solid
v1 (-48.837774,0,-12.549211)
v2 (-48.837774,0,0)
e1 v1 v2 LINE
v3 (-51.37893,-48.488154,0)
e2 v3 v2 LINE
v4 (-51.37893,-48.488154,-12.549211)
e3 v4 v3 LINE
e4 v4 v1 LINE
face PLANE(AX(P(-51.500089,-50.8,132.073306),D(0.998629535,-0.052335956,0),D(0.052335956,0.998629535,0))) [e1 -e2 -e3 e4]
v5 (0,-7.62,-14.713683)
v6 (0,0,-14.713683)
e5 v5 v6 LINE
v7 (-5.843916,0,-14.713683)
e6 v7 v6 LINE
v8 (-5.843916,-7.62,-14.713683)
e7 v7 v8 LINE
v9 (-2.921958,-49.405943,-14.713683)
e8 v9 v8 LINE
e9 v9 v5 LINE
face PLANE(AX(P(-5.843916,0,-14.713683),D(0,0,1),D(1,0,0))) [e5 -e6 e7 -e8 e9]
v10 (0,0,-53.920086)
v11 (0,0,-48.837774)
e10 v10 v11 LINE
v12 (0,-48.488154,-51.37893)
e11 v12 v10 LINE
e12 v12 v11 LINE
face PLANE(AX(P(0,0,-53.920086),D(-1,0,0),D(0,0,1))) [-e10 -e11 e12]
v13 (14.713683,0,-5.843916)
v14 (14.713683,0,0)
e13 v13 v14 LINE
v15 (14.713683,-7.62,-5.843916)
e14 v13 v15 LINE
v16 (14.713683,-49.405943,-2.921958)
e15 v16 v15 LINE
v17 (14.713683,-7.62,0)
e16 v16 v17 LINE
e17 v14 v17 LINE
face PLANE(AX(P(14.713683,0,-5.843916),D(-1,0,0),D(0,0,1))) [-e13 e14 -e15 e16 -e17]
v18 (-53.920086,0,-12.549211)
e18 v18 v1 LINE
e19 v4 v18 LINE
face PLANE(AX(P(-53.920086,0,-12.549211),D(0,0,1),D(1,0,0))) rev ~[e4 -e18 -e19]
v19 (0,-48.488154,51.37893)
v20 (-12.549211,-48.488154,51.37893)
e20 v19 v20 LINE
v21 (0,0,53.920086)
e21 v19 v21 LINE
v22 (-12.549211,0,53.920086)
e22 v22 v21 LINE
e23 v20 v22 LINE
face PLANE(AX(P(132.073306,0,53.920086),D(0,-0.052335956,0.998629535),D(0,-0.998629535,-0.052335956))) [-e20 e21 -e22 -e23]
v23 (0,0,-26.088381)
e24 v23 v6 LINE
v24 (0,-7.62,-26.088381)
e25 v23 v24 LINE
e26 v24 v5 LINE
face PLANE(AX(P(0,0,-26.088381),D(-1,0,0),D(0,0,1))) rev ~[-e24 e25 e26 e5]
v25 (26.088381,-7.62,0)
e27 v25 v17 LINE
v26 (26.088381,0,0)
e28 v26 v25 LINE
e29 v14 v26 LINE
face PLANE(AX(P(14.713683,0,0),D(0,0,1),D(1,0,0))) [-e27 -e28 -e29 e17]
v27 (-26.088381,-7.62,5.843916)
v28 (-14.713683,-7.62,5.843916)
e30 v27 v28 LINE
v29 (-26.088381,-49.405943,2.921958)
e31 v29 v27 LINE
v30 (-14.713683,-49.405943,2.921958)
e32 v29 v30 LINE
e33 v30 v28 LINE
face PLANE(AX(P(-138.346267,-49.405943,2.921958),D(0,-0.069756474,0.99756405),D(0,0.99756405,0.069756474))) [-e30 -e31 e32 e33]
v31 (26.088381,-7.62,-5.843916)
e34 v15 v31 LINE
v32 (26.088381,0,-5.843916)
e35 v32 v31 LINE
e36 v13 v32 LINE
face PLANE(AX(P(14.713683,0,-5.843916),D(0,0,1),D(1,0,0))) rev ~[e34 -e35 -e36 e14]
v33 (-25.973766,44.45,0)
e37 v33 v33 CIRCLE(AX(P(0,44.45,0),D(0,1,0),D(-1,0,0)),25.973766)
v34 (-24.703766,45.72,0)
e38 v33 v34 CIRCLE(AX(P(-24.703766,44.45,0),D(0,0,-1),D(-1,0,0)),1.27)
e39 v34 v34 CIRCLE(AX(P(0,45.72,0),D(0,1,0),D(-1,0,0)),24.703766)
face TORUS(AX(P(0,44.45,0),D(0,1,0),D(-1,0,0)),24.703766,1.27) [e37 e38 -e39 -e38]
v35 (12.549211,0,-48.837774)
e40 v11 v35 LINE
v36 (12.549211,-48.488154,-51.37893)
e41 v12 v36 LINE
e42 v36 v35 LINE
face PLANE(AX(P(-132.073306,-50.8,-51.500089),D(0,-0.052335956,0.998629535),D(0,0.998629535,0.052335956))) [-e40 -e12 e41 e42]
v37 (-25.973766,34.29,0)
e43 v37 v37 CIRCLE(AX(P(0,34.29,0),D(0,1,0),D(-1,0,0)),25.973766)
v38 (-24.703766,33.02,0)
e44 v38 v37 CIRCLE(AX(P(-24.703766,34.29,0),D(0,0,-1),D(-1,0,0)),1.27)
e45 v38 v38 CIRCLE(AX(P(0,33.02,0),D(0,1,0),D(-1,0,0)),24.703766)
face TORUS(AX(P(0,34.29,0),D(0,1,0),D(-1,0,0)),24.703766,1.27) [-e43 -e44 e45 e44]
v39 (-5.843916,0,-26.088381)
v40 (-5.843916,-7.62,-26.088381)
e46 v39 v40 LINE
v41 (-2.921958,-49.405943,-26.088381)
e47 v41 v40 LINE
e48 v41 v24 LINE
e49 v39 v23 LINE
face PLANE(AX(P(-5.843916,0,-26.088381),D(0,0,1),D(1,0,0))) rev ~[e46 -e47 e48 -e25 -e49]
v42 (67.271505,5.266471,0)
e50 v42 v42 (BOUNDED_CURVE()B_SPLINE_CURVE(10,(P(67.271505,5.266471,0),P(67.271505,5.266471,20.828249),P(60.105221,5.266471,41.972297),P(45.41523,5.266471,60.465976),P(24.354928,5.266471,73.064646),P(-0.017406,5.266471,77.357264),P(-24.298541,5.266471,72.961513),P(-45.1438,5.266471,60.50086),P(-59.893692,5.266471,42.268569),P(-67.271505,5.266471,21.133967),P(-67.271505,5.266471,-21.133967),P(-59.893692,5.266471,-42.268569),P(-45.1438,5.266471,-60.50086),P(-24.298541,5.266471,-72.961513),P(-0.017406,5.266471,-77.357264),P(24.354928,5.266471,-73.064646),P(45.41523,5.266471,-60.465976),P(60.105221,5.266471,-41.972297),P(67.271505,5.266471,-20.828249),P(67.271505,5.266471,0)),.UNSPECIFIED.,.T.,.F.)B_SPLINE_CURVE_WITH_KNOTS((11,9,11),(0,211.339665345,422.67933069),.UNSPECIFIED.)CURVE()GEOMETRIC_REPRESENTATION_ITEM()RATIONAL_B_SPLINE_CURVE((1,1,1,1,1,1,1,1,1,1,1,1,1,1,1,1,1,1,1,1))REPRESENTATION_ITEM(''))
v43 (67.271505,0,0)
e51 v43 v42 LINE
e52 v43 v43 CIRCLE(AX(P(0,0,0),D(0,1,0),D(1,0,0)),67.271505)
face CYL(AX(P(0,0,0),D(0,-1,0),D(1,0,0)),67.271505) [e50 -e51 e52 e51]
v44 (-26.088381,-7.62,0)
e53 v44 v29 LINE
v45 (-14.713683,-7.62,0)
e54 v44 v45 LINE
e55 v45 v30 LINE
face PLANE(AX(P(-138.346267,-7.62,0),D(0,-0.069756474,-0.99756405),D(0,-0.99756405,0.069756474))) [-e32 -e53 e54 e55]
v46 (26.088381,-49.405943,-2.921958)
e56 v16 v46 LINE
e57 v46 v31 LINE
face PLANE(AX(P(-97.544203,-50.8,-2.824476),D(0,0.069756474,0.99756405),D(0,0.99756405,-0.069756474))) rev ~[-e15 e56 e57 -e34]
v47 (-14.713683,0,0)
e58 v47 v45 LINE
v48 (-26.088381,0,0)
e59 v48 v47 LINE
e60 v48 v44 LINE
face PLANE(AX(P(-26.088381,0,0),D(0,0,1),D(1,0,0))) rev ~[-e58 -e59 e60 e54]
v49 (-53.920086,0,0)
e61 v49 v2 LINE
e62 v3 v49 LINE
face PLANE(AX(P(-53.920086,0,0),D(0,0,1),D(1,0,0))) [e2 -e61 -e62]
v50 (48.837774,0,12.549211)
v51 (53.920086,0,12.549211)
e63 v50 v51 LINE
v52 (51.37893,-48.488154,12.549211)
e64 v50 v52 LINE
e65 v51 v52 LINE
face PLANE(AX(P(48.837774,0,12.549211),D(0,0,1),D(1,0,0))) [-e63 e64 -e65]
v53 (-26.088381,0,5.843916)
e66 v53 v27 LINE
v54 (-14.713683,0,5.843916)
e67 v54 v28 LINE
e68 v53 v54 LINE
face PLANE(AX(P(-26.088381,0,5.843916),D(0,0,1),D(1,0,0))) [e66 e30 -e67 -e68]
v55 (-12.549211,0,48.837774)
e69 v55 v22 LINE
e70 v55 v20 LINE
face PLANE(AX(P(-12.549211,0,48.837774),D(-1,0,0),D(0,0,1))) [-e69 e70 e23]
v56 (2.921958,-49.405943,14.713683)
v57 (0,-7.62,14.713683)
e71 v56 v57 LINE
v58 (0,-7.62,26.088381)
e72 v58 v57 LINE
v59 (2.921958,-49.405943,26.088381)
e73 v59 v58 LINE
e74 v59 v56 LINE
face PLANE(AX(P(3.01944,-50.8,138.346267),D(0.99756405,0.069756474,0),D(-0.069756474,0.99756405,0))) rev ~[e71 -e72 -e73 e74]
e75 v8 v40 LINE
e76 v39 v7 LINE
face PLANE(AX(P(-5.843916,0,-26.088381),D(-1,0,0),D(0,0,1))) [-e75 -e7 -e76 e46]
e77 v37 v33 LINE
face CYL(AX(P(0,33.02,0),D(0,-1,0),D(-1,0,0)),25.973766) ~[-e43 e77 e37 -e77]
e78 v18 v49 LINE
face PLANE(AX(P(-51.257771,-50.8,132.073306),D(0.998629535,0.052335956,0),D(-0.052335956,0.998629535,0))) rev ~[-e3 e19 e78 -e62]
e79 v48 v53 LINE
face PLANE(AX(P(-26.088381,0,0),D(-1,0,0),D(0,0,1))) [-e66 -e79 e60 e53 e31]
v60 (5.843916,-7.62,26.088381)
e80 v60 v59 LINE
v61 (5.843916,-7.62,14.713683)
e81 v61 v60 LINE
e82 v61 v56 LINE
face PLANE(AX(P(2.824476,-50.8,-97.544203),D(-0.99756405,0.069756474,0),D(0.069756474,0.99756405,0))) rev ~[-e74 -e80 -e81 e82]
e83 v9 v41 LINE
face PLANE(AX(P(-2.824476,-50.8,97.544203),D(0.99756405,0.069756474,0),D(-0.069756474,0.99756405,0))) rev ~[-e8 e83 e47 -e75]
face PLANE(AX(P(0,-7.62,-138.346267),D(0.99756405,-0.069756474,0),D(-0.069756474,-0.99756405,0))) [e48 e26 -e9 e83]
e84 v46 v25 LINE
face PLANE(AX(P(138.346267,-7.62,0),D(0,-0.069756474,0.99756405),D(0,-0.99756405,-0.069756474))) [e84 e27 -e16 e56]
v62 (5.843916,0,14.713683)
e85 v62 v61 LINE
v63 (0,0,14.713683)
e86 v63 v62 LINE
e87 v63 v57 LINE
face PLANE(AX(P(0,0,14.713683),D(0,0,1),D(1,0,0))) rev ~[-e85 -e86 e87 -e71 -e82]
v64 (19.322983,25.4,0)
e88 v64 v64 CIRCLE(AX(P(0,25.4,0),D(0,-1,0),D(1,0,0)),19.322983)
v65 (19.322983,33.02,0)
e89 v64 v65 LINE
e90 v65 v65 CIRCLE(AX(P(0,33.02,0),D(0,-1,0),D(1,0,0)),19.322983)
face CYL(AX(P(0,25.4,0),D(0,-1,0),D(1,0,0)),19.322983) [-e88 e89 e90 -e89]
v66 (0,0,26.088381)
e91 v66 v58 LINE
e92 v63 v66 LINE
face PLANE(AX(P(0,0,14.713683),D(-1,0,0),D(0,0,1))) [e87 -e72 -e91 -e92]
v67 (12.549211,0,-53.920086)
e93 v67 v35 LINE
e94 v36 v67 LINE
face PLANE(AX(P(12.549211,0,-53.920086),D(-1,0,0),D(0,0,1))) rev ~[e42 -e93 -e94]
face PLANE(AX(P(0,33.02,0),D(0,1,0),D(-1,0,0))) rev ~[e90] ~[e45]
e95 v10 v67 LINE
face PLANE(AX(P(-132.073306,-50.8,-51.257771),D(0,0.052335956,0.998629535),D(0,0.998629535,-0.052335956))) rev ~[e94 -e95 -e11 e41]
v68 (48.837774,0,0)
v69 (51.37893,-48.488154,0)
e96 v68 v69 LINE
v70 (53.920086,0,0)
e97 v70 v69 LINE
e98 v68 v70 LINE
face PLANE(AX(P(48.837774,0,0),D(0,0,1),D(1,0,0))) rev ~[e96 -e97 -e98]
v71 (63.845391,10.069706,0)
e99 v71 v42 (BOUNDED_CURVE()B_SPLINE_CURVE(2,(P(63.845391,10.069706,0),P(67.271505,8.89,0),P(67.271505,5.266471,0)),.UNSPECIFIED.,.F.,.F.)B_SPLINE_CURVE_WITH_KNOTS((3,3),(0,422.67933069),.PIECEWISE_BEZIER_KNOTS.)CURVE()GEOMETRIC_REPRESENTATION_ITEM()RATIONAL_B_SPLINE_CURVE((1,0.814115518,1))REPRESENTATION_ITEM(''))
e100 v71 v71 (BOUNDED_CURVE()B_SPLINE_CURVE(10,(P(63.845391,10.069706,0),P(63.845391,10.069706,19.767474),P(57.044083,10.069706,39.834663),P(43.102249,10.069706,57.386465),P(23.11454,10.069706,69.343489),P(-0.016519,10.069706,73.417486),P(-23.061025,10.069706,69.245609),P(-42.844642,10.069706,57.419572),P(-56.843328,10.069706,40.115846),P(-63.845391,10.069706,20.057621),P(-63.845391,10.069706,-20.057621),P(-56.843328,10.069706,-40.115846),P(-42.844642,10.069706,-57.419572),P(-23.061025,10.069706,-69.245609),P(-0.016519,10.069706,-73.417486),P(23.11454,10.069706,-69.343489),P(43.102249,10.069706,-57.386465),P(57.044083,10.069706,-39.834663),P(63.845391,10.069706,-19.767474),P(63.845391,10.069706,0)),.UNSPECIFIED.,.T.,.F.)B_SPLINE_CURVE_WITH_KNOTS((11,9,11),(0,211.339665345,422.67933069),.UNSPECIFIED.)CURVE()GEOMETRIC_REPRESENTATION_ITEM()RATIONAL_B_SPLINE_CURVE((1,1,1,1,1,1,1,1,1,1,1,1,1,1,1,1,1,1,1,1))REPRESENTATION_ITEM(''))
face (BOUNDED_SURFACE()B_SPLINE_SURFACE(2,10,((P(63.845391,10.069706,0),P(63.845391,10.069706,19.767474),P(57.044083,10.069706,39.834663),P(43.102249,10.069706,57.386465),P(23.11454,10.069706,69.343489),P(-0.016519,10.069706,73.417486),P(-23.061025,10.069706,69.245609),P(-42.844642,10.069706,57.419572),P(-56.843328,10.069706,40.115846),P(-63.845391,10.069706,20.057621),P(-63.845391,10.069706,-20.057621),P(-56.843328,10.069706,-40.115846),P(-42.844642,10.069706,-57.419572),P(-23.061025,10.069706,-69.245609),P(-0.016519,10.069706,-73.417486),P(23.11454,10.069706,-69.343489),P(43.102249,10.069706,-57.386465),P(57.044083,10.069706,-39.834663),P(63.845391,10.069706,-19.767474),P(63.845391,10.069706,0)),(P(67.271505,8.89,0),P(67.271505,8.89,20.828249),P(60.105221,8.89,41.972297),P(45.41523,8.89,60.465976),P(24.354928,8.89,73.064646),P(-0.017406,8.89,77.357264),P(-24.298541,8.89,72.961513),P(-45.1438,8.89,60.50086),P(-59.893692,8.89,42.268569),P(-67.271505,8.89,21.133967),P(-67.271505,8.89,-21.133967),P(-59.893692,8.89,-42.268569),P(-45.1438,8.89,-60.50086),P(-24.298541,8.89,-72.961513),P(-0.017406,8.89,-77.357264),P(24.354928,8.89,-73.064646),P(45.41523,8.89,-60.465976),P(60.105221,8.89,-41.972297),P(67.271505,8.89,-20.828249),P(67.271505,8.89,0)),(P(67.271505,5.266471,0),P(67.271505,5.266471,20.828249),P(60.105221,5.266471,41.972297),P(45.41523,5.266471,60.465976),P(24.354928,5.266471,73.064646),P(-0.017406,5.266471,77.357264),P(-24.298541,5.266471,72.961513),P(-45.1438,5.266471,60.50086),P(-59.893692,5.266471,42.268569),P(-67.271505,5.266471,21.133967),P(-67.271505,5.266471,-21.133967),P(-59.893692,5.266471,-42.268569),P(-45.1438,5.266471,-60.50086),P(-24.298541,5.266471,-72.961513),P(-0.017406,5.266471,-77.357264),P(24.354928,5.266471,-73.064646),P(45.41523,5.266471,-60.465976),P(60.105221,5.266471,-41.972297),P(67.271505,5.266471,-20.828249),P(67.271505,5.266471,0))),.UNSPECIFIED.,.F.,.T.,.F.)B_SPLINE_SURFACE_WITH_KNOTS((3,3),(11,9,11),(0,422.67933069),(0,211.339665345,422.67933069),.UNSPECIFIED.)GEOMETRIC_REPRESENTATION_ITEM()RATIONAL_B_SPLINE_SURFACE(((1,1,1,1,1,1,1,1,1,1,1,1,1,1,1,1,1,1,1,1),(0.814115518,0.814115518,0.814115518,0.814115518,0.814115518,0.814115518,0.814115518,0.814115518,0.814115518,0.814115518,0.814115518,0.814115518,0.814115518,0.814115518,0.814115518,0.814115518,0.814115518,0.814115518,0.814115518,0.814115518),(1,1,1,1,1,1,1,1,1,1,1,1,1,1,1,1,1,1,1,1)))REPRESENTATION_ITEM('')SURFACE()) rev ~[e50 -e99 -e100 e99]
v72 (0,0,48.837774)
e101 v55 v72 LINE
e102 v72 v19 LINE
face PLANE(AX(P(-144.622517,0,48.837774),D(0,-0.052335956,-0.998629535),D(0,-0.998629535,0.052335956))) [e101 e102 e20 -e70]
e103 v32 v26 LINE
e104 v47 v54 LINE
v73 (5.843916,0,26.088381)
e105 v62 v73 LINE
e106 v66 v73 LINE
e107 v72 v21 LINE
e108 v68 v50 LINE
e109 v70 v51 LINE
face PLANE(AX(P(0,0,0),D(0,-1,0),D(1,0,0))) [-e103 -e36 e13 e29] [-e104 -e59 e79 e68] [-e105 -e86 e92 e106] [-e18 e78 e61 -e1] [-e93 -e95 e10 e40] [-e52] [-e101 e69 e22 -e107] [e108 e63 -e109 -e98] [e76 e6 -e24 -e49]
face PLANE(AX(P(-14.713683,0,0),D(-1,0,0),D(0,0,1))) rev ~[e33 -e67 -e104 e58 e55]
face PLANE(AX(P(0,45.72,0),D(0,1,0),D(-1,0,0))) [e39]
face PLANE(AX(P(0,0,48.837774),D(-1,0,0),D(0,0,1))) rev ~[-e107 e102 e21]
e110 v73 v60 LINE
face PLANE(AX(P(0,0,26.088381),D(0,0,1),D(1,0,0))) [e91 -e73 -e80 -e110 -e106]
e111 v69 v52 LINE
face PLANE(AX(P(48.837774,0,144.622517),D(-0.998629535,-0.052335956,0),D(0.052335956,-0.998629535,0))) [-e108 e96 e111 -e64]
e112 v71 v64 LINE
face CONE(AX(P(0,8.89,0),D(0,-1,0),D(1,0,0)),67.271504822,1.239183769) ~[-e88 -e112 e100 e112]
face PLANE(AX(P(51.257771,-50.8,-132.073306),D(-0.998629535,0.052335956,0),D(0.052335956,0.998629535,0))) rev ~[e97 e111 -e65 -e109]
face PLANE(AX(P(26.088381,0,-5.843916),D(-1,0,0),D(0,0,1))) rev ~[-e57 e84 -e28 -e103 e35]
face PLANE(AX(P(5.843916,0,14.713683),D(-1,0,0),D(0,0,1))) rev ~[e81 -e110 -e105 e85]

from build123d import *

# Parameters (mm, degrees)
F0_R         = 67.2715048221
F1_DEPTH     = 25.4
F2_SIZE2     = 47.9485215904
F2_SIZE      = 16.51
F3_DEPTH     = 7.62
F4_R         = 25.9737658724
F5_DEPTH     = 12.7
F6_W         = 12.5492112711
F6_H         = 5.0823129714
F6_W_2       = 5.8439155109
F6_H_2       = 11.3746980205
F6_W_3       = 5.0823129714
F6_H_3       = 12.5492112711
F6_W_4       = 11.3746980205
F6_H_4       = 5.8439155109
F7_DEPTH     = 50.8
F8_T4_DEPTH  = 276.6958225406
F8_T9_DEPTH  = 276.6958225406
F9_T4_DEPTH  = 235.8904693574
F9_T9_DEPTH  = 235.8904693574
F10_T1_DEPTH = 123.632583689
F11_T4_DEPTH = 235.8904693574
F11_T9_DEPTH = 235.8904693574
F12_T4_DEPTH = 235.8904693574
F12_T9_DEPTH = 235.8904693574
F13_T4_DEPTH = 276.6958225406
F13_T9_DEPTH = 276.6958225406
F14_T4_DEPTH = 276.6958225406
F14_T9_DEPTH = 276.6958225406
F15_T4_DEPTH = 276.6958225406
F15_T9_DEPTH = 276.6958225406
F16_R        = 5.08
F17_R        = 1.27


# Not quite as in the source:
# - a fillet or chamfer that OpenCascade refuses, or shapes differently, is made with other operations: its cross-section is extruded or revolved along the edge and cut away or added


with BuildPart() as f1:
    # F0 (on Front) → F1 (new body)
    with BuildSketch(Plane.XZ):
        Circle(F0_R)
    extrude(amount=-F1_DEPTH)

    # F2
    f2_edges = [f1.edges().sort_by_distance(p)[0] for p in [
        (-67.271505, 25.4, 0),
    ]]
    f2_side = f1.faces().sort_by_distance((-67.271505, 12.7, 0))[0]
    chamfer(f2_edges, length=F2_SIZE, length2=F2_SIZE2, reference=f2_side)

    # F3 (add): a face of the model
    f3_faces = [f1.faces().sort_by_distance(p)[0] for p in [
        (0, 25.4, 0),
    ]]
    extrude(f3_faces, amount=F3_DEPTH)

    # F4 (on face) → F5 (join)
    with BuildSketch(Plane(origin=(0, 33.02, 0), x_dir=(-1, 0, 0), z_dir=(0, 1, 0))):
        Circle(F4_R)
    extrude(amount=F5_DEPTH)

    # F6 (on face) → F7 (join)
    with BuildSketch(Plane.XZ):
        with Locations((-6.2746056356, 51.3789299875)):
            Rectangle(F6_W, F6_H)
        with Locations((2.9219577555, 20.4010321759)):
            Rectangle(F6_W_2, F6_H_2)
        with Locations((-51.3789299875, -6.2746056356)):
            Rectangle(F6_W_3, F6_H_3)
        with Locations((-20.4010321759, 2.9219577555)):
            Rectangle(F6_W_4, F6_H_4)
        with Locations((6.2746056356, -51.3789299875)):
            Rectangle(F6_W, F6_H)
        with Locations((-2.9219577555, -20.4010321759)):
            Rectangle(F6_W_2, F6_H_2)
        with Locations((51.3789299875, 6.2746056356)):
            Rectangle(F6_W_3, F6_H_3)
        with Locations((20.4010321759, -2.9219577555)):
            Rectangle(F6_W_4, F6_H_4)
    extrude(amount=F7_DEPTH)

    # F8: chamfer of 50.8 x 2.6623151876 on 2 edges, made by hand


with BuildPart() as f8_tool2:
    # F8_s3 → F8_t4 (new body)
    with BuildSketch(Plane.YZ.offset(132.0733056347)):
        Polygon((0, 53.9200864732), (-50.8, 51.2577712856), (-50.8, 53.9200864732), align=None)
    extrude(amount=-F8_T4_DEPTH)

    split(bisect_by=Plane.XZ, keep=Keep.TOP)


with BuildPart() as f1_1:
    add(f1.part)

    # F8_t1: cut F8_tool2
    add(f8_tool2.part, mode=Mode.SUBTRACT)


with BuildPart() as f8_tool7:
    # F8_s8 → F8_t9 (new body)
    with BuildSketch(Plane.YZ.offset(-144.6225169058)):
        Polygon((0, 48.8377735019), (-50.8, 51.5000886895), (-50.8, 48.8377735019), align=None)
    extrude(amount=F8_T9_DEPTH)

    split(bisect_by=Plane.XZ, keep=Keep.TOP)


with BuildPart() as f1_2:
    add(f1_1.part)

    # F8_t6: cut F8_tool7
    add(f8_tool7.part, mode=Mode.SUBTRACT)

    # F9: chamfer of 43.18 x 3.0194397397 on 2 edges, made by hand


with BuildPart() as f9_tool2:
    # F9_s3 → F9_t4 (new body)
    with BuildSketch(Plane.XY.offset(-97.5442025028)):
        Polygon((2.8244757712, -50.8), (5.8439155109, -7.62), (5.8439155109, -50.8), align=None)
    extrude(amount=F9_T4_DEPTH)

    split(bisect_by=Plane.XY.offset(-48.8377735019), keep=Keep.TOP)


with BuildPart() as f1_3:
    add(f1_2.part)

    # F9_t1: cut F9_tool2
    add(f9_tool2.part, mode=Mode.SUBTRACT)


with BuildPart() as f9_tool7:
    # F9_s8 → F9_t9 (new body)
    with BuildSketch(Plane.XY.offset(138.3462668546)):
        Polygon((3.0194397397, -50.8), (0, -7.62), (0, -50.8), align=None)
    extrude(amount=-F9_T9_DEPTH)

    split(bisect_by=Plane.XY.offset(-26.0883811861), keep=Keep.TOP)


with BuildPart() as f1_4:
    add(f1_3.part)

    # F9_t6: cut F9_tool7
    add(f9_tool7.part, mode=Mode.SUBTRACT)

    # F10: chamfer of 43.18 x 3.0194397397 on 2 edges, made by hand

    # F10_s2 → F10_t1 (cut)
    with BuildSketch(Plane.YZ.offset(-138.3462668546)):
        Polygon((-7.62, 0), (-50.8, 3.0194397397), (-50.8, 0), align=None)
        Polygon((-50.8, 2.8244757712), (-7.62, 5.8439155109), (-50.8, 5.8439155109), align=None)
    extrude(amount=F10_T1_DEPTH, mode=Mode.SUBTRACT)

    # F11: chamfer of 43.18 x 3.0194397397 on 2 edges, made by hand


with BuildPart() as f11_tool2:
    # F11_s3 → F11_t4 (new body)
    with BuildSketch(Plane.XY.offset(97.5442025028)):
        Polygon((-2.8244757712, -50.8), (-5.8439155109, -7.62), (-5.8439155109, -50.8), align=None)
    extrude(amount=-F11_T4_DEPTH)

    split(bisect_by=Plane(origin=(0, 2.5524687068, 48.7040042853), x_dir=(1, 0, 0), z_dir=(0, -0.0523359562, -0.9986295348)), keep=Keep.TOP)


with BuildPart() as f1_5:
    add(f1_4.part)

    # F11_t1: cut F11_tool2
    add(f11_tool2.part, mode=Mode.SUBTRACT)


with BuildPart() as f11_tool7:
    # F11_s8 → F11_t9 (new body)
    with BuildSketch(Plane.XY.offset(-138.3462668546)):
        Polygon((0, -7.62), (-3.0194397397, -50.8), (0, -50.8), align=None)
    extrude(amount=F11_T9_DEPTH)

    split(bisect_by=Plane(origin=(0, 2.5524687068, 48.7040042853), x_dir=(1, 0, 0), z_dir=(0, -0.0523359562, -0.9986295348)), keep=Keep.TOP)


with BuildPart() as f1_6:
    add(f1_5.part)

    # F11_t6: cut F11_tool7
    add(f11_tool7.part, mode=Mode.SUBTRACT)

    # F12: chamfer of 43.18 x 3.0194397397 on 2 edges, made by hand


with BuildPart() as f12_tool2:
    # F12_s3 → F12_t4 (new body)
    with BuildSketch(Plane.YZ.offset(-97.5442025028)):
        Polygon((-50.8, -2.8244757712), (-7.62, -5.8439155109), (-50.8, -5.8439155109), align=None)
    extrude(amount=F12_T4_DEPTH)

    split(bisect_by=Plane.YZ.offset(-48.8377735019), keep=Keep.TOP)


with BuildPart() as f1_7:
    add(f1_6.part)

    # F12_t1: cut F12_tool2
    add(f12_tool2.part, mode=Mode.SUBTRACT)


with BuildPart() as f12_tool7:
    # F12_s8 → F12_t9 (new body)
    with BuildSketch(Plane.YZ.offset(138.3462668546)):
        Polygon((-7.62, 0), (-50.8, -3.0194397397), (-50.8, 0), align=None)
    extrude(amount=-F12_T9_DEPTH)

    split(bisect_by=Plane.YZ.offset(-48.8377735019), keep=Keep.TOP)


with BuildPart() as f1_8:
    add(f1_7.part)

    # F12_t6: cut F12_tool7
    add(f12_tool7.part, mode=Mode.SUBTRACT)

    # F13: chamfer of 50.8 x 2.6623151876 on 2 edges, made by hand


with BuildPart() as f13_tool2:
    # F13_s3 → F13_t4 (new body)
    with BuildSketch(Plane.XY.offset(132.0733056347)):
        Polygon((-51.5000886895, -50.8), (-48.8377735019, 0), (-48.8377735019, -50.8), align=None)
    extrude(amount=-F13_T4_DEPTH)

    split(bisect_by=Plane.XZ, keep=Keep.TOP)


with BuildPart() as f1_9:
    add(f1_8.part)

    # F13_t1: cut F13_tool2
    add(f13_tool2.part, mode=Mode.SUBTRACT)


with BuildPart() as f13_tool7:
    # F13_s8 → F13_t9 (new body)
    with BuildSketch(Plane.XY.offset(132.0733056347)):
        Polygon((-51.2577712856, -50.8), (-53.9200864732, 0), (-53.9200864732, -50.8), align=None)
    extrude(amount=-F13_T9_DEPTH)

    split(bisect_by=Plane.XZ, keep=Keep.TOP)


with BuildPart() as f1_10:
    add(f1_9.part)

    # F13_t6: cut F13_tool7
    add(f13_tool7.part, mode=Mode.SUBTRACT)

    # F14: chamfer of 50.8 x 2.6623151876 on 2 edges, made by hand


with BuildPart() as f14_tool2:
    # F14_s3 → F14_t4 (new body)
    with BuildSketch(Plane.YZ.offset(-132.0733056347)):
        Polygon((-50.8, -51.2577712856), (0, -53.9200864732), (-50.8, -53.9200864732), align=None)
    extrude(amount=F14_T4_DEPTH)

    split(bisect_by=Plane.XZ, keep=Keep.TOP)


with BuildPart() as f1_11:
    add(f1_10.part)

    # F14_t1: cut F14_tool2
    add(f14_tool2.part, mode=Mode.SUBTRACT)


with BuildPart() as f14_tool7:
    # F14_s8 → F14_t9 (new body)
    with BuildSketch(Plane.YZ.offset(-132.0733056347)):
        Polygon((-50.8, -51.5000886895), (0, -48.8377735019), (-50.8, -48.8377735019), align=None)
    extrude(amount=F14_T9_DEPTH)

    split(bisect_by=Plane.XZ, keep=Keep.TOP)


with BuildPart() as f1_12:
    add(f1_11.part)

    # F14_t6: cut F14_tool7
    add(f14_tool7.part, mode=Mode.SUBTRACT)

    # F15: chamfer of 50.8 x 2.6623151876 on 2 edges, made by hand


with BuildPart() as f15_tool2:
    # F15_s3 → F15_t4 (new body)
    with BuildSketch(Plane.XY.offset(-132.0733056347)):
        Polygon((51.2577712856, -50.8), (53.9200864732, 0), (53.9200864732, -50.8), align=None)
    extrude(amount=F15_T4_DEPTH)

    split(bisect_by=Plane.XZ, keep=Keep.TOP)


with BuildPart() as f1_13:
    add(f1_12.part)

    # F15_t1: cut F15_tool2
    add(f15_tool2.part, mode=Mode.SUBTRACT)


with BuildPart() as f15_tool7:
    # F15_s8 → F15_t9 (new body)
    with BuildSketch(Plane.XY.offset(144.6225169058)):
        Polygon((48.8377735019, 0), (51.5000886895, -50.8), (48.8377735019, -50.8), align=None)
    extrude(amount=-F15_T9_DEPTH)

    split(bisect_by=Plane.XZ, keep=Keep.TOP)


with BuildPart() as f1_14:
    add(f1_13.part)

    # F15_t6: cut F15_tool7
    add(f15_tool7.part, mode=Mode.SUBTRACT)

    # F16
    f16_edges = [f1_14.edges().sort_by_distance(p)[0] for p in [
        (-67.271505, 8.89, 0),
    ]]
    fillet(f16_edges, radius=F16_R)

    # F17
    f17_edges = [f1_14.edges().sort_by_distance(p)[0] for p in [
        (25.973766, 45.72, 0),
        (25.973766, 33.02, 0),
    ]]
    fillet(f17_edges, radius=F17_R)


solid = f1_14.part
